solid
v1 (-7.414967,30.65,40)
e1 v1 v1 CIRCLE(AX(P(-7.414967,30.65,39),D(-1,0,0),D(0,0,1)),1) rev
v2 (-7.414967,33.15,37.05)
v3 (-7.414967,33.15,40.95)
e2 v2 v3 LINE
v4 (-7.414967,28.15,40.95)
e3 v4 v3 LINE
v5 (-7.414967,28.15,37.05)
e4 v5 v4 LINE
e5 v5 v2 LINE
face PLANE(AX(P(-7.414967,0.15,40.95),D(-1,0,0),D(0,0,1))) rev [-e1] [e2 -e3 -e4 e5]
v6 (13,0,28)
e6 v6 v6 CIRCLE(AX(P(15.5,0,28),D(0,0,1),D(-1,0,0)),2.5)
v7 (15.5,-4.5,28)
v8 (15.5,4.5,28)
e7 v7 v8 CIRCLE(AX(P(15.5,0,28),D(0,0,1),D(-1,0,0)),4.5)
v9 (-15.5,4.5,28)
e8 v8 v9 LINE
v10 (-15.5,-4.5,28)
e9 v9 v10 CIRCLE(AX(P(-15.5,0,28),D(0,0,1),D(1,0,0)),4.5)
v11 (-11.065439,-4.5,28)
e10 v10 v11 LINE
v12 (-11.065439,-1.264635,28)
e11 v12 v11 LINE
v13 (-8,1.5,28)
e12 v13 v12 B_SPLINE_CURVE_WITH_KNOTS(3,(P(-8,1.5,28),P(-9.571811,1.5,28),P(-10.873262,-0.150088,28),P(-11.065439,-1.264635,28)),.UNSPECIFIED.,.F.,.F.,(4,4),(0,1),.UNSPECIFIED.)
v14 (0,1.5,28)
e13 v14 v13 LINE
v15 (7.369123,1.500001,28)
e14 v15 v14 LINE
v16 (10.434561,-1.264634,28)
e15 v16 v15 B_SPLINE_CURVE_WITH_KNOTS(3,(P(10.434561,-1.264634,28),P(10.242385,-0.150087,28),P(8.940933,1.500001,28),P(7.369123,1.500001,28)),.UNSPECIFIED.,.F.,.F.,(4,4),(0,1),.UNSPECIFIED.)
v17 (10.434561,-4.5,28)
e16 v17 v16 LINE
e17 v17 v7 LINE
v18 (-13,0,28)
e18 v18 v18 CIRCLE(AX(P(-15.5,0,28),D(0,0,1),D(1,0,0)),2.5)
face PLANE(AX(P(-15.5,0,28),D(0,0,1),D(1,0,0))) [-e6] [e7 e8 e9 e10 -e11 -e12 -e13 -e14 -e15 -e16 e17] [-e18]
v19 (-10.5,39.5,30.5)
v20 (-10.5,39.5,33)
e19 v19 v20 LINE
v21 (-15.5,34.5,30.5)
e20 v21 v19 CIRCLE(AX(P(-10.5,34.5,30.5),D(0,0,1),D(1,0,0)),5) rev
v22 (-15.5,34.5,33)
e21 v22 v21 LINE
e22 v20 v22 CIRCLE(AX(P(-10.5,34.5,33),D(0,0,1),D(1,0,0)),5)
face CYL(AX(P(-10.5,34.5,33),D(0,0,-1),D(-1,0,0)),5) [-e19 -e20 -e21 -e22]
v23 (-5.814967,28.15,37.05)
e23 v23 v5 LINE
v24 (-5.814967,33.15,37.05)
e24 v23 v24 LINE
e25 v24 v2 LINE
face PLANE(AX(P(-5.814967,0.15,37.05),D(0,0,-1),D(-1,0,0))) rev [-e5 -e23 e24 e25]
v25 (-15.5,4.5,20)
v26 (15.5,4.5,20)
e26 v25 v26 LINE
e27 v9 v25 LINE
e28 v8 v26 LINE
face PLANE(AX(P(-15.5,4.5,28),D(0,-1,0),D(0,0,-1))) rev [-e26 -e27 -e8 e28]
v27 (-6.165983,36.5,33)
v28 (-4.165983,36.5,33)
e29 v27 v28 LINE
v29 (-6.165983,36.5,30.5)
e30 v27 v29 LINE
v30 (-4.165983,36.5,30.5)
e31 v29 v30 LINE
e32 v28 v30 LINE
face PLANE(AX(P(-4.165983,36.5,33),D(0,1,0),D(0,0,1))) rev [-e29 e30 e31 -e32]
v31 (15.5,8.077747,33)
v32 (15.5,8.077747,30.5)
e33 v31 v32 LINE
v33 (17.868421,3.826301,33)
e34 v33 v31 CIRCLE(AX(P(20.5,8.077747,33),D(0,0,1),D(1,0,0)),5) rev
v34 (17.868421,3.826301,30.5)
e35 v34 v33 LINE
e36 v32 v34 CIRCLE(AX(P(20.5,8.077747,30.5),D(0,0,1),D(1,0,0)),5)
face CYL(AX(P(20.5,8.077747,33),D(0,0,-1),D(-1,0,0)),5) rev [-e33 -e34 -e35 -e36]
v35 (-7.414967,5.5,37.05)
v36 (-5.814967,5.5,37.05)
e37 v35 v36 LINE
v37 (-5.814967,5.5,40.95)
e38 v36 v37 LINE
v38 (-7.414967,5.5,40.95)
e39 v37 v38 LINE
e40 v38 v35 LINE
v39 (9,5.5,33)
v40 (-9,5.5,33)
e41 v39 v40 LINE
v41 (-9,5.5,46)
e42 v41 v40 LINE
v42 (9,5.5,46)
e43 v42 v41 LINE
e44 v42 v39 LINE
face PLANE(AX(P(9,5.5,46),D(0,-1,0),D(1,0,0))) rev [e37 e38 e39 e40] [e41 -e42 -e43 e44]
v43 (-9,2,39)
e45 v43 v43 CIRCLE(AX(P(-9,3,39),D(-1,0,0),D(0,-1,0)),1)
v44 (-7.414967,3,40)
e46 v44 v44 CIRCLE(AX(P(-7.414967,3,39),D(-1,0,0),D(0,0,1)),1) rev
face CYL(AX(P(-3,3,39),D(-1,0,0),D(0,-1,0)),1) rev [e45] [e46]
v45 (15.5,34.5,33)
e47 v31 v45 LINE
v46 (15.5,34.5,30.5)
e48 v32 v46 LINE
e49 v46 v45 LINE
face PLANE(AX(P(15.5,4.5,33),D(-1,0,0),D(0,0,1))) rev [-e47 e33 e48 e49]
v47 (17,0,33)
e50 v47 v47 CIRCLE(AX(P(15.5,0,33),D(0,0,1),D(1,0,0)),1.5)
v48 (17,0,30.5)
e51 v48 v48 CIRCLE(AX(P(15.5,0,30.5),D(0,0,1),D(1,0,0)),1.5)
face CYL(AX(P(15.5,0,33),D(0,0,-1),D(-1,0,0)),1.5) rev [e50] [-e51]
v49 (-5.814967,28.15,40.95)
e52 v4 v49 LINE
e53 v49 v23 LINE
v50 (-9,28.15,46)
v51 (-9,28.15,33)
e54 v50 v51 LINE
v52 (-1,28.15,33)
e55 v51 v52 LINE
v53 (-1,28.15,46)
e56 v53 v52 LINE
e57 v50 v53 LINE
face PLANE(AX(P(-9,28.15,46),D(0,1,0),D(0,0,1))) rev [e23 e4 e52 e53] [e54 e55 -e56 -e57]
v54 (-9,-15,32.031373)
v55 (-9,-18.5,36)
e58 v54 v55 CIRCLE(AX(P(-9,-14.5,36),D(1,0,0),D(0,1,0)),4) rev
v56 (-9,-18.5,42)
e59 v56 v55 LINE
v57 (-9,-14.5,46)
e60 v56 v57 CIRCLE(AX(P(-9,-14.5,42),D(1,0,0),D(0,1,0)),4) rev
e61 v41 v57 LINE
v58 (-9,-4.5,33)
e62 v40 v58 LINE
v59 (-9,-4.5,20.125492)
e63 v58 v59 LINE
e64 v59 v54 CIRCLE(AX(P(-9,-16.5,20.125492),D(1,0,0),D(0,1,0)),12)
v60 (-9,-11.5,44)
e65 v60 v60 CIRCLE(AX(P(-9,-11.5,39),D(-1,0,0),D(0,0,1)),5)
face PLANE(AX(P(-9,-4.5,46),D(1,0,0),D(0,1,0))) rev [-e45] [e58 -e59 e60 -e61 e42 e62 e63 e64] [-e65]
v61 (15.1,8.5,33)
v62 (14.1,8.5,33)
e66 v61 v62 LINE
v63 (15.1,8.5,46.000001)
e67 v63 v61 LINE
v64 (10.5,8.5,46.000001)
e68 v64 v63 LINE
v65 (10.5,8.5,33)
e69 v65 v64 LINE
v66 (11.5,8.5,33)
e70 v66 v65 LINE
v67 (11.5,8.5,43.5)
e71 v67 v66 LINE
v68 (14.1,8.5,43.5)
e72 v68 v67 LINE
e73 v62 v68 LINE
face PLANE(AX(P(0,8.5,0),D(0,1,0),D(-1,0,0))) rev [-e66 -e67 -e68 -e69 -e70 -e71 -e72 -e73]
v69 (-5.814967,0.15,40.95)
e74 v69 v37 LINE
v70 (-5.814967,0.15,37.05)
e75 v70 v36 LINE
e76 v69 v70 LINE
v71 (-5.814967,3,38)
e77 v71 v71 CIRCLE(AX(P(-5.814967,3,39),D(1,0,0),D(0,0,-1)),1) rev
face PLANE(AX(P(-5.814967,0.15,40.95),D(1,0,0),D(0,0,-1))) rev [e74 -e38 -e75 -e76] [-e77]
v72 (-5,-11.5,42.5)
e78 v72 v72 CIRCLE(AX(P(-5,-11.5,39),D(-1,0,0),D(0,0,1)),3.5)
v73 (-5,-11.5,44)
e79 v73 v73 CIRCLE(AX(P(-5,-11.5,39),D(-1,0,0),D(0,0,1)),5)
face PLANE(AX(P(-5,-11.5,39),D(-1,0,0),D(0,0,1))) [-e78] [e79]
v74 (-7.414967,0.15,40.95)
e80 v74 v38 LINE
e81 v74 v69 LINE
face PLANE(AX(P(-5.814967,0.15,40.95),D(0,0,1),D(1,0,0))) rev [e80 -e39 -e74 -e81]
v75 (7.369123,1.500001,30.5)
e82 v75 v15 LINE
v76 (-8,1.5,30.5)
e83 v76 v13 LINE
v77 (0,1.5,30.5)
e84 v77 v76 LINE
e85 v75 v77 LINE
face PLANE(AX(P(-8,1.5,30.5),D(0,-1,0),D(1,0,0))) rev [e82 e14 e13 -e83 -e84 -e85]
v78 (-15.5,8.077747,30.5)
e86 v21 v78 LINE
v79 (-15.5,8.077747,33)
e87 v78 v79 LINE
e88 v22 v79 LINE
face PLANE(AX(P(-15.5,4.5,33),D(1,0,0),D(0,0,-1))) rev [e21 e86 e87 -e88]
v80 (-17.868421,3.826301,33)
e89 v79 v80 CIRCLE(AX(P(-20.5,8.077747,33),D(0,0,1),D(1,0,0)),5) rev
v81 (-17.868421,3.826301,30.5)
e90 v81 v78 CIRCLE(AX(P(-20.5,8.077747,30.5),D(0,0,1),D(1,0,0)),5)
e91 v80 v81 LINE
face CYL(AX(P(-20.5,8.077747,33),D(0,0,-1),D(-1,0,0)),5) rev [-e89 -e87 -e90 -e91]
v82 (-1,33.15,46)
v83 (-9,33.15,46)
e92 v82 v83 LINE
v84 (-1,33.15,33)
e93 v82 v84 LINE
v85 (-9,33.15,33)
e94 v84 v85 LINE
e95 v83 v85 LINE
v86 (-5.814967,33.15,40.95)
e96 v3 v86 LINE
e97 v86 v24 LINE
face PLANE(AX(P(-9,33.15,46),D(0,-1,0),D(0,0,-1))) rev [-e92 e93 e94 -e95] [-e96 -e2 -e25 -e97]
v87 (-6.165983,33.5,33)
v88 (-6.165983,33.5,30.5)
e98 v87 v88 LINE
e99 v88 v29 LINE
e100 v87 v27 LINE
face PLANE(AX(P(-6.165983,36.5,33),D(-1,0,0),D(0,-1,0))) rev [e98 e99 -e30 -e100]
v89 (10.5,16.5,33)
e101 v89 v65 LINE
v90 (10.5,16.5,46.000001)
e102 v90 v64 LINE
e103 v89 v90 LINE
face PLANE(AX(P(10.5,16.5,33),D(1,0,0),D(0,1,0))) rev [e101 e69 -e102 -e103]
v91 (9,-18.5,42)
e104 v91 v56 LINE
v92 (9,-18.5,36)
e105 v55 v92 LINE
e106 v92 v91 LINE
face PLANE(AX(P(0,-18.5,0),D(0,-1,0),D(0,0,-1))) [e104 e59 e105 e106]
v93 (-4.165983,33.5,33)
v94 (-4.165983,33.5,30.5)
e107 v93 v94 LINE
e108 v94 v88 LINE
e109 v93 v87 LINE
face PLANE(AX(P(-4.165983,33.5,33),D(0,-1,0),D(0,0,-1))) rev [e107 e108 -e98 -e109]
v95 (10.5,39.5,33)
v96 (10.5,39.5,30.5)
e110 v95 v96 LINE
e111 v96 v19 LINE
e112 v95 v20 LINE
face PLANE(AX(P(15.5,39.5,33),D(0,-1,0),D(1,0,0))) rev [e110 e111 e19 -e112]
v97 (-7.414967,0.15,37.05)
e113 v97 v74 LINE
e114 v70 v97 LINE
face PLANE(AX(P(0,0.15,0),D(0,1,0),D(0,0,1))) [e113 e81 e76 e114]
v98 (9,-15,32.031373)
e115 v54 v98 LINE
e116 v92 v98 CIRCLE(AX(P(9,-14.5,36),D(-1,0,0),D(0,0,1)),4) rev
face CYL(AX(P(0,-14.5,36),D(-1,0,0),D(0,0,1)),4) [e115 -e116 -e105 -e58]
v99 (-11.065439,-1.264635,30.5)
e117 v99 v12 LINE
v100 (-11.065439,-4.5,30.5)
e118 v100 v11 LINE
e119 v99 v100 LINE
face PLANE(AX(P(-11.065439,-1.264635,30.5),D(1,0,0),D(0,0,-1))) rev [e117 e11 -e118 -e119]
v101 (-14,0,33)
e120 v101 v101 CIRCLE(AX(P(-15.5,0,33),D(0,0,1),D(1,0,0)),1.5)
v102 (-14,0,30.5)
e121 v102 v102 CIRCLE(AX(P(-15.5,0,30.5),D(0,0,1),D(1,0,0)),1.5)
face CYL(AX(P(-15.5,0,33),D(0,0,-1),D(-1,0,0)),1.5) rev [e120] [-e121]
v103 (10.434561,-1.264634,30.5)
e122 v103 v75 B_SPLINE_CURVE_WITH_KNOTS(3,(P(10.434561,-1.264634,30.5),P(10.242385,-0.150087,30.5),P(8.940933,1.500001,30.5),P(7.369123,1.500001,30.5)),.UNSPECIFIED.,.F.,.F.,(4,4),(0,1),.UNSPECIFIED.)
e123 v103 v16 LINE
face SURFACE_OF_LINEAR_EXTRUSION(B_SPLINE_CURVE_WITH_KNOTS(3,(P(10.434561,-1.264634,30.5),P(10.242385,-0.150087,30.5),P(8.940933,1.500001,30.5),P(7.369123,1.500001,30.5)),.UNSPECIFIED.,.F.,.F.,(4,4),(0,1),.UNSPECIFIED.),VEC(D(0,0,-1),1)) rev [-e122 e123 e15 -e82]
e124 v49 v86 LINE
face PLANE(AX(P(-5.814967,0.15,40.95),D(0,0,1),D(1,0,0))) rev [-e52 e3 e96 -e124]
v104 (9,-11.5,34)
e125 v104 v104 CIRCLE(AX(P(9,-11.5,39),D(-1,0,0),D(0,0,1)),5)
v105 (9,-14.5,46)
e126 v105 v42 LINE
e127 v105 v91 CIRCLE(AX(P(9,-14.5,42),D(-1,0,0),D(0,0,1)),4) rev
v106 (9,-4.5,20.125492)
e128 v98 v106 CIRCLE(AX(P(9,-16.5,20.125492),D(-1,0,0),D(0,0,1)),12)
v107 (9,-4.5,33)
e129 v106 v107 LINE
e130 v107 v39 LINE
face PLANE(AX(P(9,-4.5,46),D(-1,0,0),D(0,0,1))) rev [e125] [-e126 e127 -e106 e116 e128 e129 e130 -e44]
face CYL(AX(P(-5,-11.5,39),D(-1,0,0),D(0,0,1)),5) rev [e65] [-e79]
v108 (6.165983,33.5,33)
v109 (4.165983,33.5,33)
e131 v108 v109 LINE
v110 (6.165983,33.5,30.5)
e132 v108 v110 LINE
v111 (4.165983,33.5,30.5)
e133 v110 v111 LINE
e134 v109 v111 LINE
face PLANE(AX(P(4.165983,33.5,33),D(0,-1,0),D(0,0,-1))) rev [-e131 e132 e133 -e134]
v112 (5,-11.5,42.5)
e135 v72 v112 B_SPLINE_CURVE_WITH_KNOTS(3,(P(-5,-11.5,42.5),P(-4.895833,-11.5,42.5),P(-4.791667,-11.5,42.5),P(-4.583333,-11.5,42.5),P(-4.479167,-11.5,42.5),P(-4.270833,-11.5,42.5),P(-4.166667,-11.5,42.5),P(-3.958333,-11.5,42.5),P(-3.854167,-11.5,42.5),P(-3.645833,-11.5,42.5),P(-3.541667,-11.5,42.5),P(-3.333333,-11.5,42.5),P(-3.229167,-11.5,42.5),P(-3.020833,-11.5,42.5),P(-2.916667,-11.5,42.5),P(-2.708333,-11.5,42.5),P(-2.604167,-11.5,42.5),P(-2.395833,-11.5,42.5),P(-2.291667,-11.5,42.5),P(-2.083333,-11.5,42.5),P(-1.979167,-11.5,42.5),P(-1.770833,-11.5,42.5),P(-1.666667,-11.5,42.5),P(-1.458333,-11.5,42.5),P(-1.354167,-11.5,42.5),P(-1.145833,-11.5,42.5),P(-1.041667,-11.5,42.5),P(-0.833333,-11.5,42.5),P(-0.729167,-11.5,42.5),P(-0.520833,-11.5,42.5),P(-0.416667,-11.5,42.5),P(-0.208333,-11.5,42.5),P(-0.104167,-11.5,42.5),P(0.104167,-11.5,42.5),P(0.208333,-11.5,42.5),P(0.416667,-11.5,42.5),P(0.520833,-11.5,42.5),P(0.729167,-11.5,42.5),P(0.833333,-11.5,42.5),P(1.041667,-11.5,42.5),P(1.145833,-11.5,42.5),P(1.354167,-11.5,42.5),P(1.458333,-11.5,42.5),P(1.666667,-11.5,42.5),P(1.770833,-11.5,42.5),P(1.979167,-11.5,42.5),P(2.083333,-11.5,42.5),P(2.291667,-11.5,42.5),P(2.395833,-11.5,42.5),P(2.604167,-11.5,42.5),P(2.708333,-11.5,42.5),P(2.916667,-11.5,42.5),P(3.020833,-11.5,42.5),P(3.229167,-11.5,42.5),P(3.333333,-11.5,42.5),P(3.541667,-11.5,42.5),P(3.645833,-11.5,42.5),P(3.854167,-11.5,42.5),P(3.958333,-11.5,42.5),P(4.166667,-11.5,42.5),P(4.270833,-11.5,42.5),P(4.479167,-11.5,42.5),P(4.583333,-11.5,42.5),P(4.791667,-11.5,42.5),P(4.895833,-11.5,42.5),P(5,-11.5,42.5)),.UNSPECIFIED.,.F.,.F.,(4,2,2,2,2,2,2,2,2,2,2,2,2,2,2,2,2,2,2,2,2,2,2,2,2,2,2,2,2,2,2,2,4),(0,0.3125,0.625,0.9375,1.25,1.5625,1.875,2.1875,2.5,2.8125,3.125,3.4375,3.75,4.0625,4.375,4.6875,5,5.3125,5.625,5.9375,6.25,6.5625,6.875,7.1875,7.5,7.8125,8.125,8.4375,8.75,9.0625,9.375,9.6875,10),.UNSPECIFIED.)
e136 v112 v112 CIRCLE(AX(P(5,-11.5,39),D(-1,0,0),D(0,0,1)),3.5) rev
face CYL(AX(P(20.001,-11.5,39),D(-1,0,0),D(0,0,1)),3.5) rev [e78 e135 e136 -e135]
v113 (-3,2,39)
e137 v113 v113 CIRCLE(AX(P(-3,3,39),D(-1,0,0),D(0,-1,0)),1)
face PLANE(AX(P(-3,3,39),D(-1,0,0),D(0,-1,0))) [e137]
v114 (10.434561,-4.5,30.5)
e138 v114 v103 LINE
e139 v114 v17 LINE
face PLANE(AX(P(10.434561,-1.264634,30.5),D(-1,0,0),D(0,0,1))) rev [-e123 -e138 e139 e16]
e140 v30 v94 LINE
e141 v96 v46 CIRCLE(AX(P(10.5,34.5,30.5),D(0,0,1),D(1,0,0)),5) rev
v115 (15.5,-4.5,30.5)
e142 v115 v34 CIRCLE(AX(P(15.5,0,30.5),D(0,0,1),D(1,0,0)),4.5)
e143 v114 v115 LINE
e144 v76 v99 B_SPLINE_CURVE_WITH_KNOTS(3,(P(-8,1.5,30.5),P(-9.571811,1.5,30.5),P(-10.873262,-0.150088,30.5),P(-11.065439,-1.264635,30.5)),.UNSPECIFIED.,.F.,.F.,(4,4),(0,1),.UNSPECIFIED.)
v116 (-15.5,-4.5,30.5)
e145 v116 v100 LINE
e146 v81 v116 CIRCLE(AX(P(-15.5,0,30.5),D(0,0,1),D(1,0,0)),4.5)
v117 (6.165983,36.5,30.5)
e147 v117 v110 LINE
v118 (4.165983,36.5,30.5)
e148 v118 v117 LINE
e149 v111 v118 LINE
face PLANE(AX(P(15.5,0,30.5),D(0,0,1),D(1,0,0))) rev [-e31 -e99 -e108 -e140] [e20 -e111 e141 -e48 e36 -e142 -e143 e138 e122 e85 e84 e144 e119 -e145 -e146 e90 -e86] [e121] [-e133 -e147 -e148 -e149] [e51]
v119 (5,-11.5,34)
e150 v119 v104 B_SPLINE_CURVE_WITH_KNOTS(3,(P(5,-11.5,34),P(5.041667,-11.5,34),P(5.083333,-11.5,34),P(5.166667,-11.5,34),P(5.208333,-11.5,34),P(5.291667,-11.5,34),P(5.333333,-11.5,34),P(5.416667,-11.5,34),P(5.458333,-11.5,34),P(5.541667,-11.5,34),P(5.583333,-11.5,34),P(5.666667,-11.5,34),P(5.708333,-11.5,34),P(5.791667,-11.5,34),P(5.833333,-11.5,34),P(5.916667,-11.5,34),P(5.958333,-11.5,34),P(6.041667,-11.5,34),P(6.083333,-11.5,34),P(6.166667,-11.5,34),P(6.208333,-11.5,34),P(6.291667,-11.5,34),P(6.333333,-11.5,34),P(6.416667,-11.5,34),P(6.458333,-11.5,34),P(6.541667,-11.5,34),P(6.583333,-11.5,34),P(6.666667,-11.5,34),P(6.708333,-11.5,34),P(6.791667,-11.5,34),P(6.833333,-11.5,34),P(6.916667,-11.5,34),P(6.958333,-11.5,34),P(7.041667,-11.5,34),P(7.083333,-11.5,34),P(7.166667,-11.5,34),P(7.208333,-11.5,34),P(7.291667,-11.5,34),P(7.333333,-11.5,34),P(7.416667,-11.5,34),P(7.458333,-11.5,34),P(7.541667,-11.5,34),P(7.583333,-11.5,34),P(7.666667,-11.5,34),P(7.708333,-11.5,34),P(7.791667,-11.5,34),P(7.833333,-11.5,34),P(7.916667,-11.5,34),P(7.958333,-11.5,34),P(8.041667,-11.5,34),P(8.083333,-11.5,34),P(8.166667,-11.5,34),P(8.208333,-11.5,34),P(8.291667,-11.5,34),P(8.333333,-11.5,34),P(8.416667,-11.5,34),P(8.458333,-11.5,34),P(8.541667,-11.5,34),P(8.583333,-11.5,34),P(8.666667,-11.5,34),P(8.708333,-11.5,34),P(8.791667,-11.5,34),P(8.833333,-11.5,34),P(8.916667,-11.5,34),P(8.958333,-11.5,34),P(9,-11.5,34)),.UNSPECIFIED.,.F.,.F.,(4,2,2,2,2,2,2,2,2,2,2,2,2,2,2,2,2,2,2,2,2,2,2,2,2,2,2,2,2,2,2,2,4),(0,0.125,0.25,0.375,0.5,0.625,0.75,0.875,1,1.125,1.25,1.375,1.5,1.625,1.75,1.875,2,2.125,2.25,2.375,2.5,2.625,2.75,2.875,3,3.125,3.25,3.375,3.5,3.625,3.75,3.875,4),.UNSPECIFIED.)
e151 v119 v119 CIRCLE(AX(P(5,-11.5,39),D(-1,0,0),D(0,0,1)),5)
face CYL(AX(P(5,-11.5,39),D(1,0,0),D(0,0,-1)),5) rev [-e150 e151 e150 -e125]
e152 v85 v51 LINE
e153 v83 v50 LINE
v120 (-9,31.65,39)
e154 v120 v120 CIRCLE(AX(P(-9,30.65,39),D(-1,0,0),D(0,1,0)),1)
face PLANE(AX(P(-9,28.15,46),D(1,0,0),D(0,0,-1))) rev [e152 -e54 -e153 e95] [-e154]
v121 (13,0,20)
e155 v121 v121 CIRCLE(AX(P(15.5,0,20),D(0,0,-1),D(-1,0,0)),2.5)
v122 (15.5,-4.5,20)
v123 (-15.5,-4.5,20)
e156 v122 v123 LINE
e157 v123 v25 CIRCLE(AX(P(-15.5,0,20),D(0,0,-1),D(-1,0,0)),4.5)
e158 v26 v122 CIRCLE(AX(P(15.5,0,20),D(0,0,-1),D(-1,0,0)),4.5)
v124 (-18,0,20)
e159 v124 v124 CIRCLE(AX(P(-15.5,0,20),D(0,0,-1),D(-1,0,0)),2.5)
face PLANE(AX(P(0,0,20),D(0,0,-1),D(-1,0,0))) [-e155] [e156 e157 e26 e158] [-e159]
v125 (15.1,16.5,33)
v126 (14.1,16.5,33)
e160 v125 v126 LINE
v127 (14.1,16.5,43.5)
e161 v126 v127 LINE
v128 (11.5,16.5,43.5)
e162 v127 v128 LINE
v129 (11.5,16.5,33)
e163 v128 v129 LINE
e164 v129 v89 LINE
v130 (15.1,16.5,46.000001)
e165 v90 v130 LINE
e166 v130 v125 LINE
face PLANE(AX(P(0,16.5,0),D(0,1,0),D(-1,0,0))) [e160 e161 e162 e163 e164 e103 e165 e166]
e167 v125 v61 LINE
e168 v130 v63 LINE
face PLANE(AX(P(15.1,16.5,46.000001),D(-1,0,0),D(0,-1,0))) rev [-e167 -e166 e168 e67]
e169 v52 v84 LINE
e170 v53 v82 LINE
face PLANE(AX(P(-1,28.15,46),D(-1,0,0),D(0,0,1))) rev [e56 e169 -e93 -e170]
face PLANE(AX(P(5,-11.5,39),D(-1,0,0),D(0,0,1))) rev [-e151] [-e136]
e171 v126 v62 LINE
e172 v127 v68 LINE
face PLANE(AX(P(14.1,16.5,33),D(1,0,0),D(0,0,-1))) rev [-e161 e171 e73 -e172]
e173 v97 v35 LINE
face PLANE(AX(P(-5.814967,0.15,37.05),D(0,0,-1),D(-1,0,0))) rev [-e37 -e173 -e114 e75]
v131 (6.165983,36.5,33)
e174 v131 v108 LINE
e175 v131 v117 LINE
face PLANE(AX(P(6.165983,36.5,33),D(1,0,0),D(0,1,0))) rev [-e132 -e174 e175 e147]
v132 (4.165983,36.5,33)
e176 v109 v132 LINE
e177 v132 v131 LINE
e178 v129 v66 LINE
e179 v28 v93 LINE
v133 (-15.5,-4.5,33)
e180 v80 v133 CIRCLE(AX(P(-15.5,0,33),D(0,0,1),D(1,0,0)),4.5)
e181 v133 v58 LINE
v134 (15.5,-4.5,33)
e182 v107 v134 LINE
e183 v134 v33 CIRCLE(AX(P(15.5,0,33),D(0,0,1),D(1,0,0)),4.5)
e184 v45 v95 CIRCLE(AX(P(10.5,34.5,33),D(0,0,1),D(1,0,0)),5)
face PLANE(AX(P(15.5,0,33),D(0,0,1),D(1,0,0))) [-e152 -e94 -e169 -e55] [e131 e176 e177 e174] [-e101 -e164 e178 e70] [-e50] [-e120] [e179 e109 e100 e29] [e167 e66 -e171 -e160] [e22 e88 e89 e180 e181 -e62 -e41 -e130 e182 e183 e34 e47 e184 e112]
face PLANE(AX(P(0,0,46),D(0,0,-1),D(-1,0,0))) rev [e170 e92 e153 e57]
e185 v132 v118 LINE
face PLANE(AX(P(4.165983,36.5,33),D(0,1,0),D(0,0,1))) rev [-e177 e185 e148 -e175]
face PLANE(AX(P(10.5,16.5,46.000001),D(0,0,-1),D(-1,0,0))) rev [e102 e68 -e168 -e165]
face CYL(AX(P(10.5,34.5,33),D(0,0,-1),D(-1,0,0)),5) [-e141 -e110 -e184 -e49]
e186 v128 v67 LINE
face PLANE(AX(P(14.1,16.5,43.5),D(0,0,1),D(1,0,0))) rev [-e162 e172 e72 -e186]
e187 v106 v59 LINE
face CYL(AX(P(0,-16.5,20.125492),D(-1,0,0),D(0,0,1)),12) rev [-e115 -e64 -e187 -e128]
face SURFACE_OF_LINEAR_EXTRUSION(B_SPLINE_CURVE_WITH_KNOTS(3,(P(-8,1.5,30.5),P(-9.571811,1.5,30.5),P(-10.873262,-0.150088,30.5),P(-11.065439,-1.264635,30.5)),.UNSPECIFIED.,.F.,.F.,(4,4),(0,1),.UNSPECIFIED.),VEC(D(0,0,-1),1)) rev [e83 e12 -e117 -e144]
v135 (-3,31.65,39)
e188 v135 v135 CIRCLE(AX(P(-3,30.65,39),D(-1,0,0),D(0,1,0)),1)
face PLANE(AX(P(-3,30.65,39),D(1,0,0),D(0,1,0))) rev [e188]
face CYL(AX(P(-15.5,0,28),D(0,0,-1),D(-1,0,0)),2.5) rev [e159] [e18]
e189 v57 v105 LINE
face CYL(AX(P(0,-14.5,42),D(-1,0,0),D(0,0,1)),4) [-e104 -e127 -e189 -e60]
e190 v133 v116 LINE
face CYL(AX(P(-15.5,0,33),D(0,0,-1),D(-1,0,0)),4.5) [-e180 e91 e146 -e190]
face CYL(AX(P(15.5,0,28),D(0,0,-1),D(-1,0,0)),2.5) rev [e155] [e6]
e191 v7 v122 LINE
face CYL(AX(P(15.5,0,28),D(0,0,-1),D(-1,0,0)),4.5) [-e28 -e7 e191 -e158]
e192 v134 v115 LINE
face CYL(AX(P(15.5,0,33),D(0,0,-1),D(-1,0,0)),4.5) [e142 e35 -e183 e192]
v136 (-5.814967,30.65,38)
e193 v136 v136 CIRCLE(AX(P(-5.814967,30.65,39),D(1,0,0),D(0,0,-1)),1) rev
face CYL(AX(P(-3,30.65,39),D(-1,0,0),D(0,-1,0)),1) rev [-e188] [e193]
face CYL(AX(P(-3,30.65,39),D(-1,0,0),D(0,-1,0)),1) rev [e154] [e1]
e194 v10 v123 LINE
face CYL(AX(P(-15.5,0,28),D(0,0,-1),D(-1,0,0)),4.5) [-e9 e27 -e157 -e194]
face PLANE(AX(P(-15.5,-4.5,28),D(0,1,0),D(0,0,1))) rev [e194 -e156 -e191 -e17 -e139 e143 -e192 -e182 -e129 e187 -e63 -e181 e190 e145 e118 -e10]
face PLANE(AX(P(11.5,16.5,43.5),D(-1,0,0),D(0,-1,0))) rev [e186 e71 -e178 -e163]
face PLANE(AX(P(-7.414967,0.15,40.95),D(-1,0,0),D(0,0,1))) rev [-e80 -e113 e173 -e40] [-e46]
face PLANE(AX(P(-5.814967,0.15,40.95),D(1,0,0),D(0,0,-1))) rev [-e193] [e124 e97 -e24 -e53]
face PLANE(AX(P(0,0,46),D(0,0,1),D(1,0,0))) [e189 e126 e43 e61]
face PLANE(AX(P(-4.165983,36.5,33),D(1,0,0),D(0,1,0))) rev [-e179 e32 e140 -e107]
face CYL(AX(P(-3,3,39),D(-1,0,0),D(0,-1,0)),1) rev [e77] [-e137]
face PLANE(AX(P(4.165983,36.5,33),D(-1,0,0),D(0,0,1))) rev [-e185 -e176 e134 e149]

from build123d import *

# Parameters (mm, degrees)
CROQUIS1_R              = 2.5
SALIENTE_EXTRUIR1_DEPTH = 28
SALIENTE_EXTRUIR3_DEPTH = 2.5
CROQUIS8_R              = 1.5
SALIENTE_EXTRUIR4_DEPTH = 2.5
CROQUIS9_W              = 18
CROQUIS9_H              = 10
SALIENTE_EXTRUIR5_DEPTH = 13
CROQUIS3_W              = 18
CROQUIS3_H              = 14
SALIENTE_EXTRUIR2_DEPTH = 14
CROQUIS4_R              = 5
CORTAR_EXTRUIR1_DEPTH   = 4
CORTAR_EXTRUIR2_START   = -14
CROQUIS4_2_R            = 5
CORTAR_EXTRUIR2_DEPTH   = 4
CORTAR_EXTRUIR3_REACH   = 67.584
CROQUIS5_R              = 3.5
REDONDEO1_R             = 4
CROQUIS10_W             = 40
CROQUIS10_H             = 9
CORTAR_EXTRUIR4_DEPTH   = 20
CROQUIS11_W             = 8
CROQUIS11_H             = 5
SALIENTE_EXTRUIR6_DEPTH = 13
CROQUIS12_R             = 1
CORTAR_EXTRUIR5_DEPTH   = 6
CROQUIS13_W             = 1.6
CROQUIS13_H             = 3.9
CORTAR_EXTRUIR6_DEPTH   = 33
REDONDEO2_R             = 5
REDONDEO3_R             = 12
SALIENTE_EXTRUIR7_START = 3
SALIENTE_EXTRUIR7_DEPTH = 8
CROQUIS16_W             = 2
CROQUIS16_H             = 3
CORTAR_EXTRUIR7_DEPTH   = 2.5


with BuildPart() as part:
    # Croquis1 → Saliente-Extruir1 (new body)
    with BuildSketch(Plane.XY):
        with BuildLine():
            Line((-15.5, 4.5), (15.5, 4.5))
            ThreePointArc((15.5, 4.5), (20, 0), (15.5, -4.5))
            Line((15.5, -4.5), (-15.5, -4.5))
            ThreePointArc((-15.5, -4.5), (-20, 0), (-15.5, 4.5))
        make_face()
        with Locations((-15.5, 0)):
            Circle(CROQUIS1_R, mode=Mode.SUBTRACT)
        with Locations(Location((15.5, 0, 0), (0, 0, 180))):
            Circle(CROQUIS1_R, mode=Mode.SUBTRACT)
    extrude(amount=SALIENTE_EXTRUIR1_DEPTH)

    # Croquis7 → Saliente-Extruir3 (add)
    with BuildSketch(Plane.XY.offset(28)):
        with BuildLine():
            Line((10.434561388, -1.264633608), (10.434561388, -4.5))
            Line((10.434561388, -4.5), (-11.065438612, -4.5))
            Line((-11.065438612, -4.5), (-11.065438612, -1.264634516))
            add(Edge.make_bspline(
                [(-11.065438612, -1.264634516), (-10.873261798, -0.150088047), (-9.571810624, 1.50000001), (-7.999999983, 1.5)],
                knots=[0, 0, 0, 0, 1, 1, 1, 1], degree=3))
            Line((-7.999999983, 1.5), (1e-08, 1.5))
            Line((1e-08, 1.5), (7.369122804, 1.500000949))
            add(Edge.make_bspline(
                [(7.369122804, 1.500000949), (8.940933445, 1.500000937), (10.242384596, -0.150087137), (10.434561388, -1.264633608)],
                knots=[0, 0, 0, 0, 1, 1, 1, 1], degree=3))
        make_face()
    extrude(amount=SALIENTE_EXTRUIR3_DEPTH)

    # Croquis8 → Saliente-Extruir4 (add)
    with BuildSketch(Plane.XY.offset(30.5)):
        with BuildLine():
            Line((15.5, 4.5), (15.5, 39.5))
            Line((15.5, 39.5), (-15.5, 39.5))
            Line((-15.5, 39.5), (-15.5, 4.5))
            ThreePointArc((-15.5, 4.5), (-20, 0), (-15.5, -4.5))
            Line((-15.5, -4.5), (15.5, -4.5))
            ThreePointArc((15.5, -4.5), (20, 0), (15.5, 4.5))
        make_face()
        with Locations((15.5, 0)):
            Circle(CROQUIS8_R, mode=Mode.SUBTRACT)
        with Locations((-15.5, 0)):
            Circle(CROQUIS8_R, mode=Mode.SUBTRACT)
    extrude(amount=SALIENTE_EXTRUIR4_DEPTH)

    # Croquis9 → Saliente-Extruir5 (add)
    with BuildSketch(Plane.XY.offset(33)):
        with Locations((0, 0.5)):
            Rectangle(CROQUIS9_W, CROQUIS9_H)
    extrude(amount=SALIENTE_EXTRUIR5_DEPTH)

    # Croquis3 → Saliente-Extruir2 (add)
    with BuildSketch(Plane.XZ.offset(4.5)):
        with Locations((0, 39)):
            Rectangle(CROQUIS3_W, CROQUIS3_H)
    extrude(amount=SALIENTE_EXTRUIR2_DEPTH)

    # Croquis4 → Cortar-Extruir1 (cut)
    with BuildSketch(Plane.ZY.offset(9)):
        with Locations((39, -11.5)):
            Circle(CROQUIS4_R)
    extrude(amount=-CORTAR_EXTRUIR1_DEPTH, mode=Mode.SUBTRACT)

    # Croquis4<2> → Cortar-Extruir2 (cut)
    with BuildSketch(Plane.ZY.offset(9).offset(CORTAR_EXTRUIR2_START)):
        with Locations((39, -11.5)):
            Circle(CROQUIS4_2_R)
    extrude(amount=-CORTAR_EXTRUIR2_DEPTH, mode=Mode.SUBTRACT)

    # Croquis5 → Cortar-Extruir3 (cut, up to next)
    with BuildSketch(Plane.ZY.offset(5), mode=Mode.PRIVATE) as cortar_extruir3_sk1:
        with Locations((39, -11.5)):
            Circle(CROQUIS5_R)
    cortar_extruir3_tool1 = extrude(cortar_extruir3_sk1.sketch, amount=-CORTAR_EXTRUIR3_REACH, mode=Mode.PRIVATE) & part.part
    add(cortar_extruir3_tool1.solids().sort_by_distance((-5, -11.5, 39))[0], mode=Mode.SUBTRACT)

    # Redondeo1
    redondeo1_edges = [part.edges().sort_by_distance(p)[0] for p in [
        (0, -18.5, 32),
        (0, -18.5, 46),
    ]]
    fillet(redondeo1_edges, radius=REDONDEO1_R)

    # Croquis10 → Cortar-Extruir4 (cut)
    with BuildSketch(Plane(origin=(0, 0, 0), x_dir=(-1, 0, 0), z_dir=(0, 0, -1))):
        Rectangle(CROQUIS10_W, CROQUIS10_H)
    extrude(amount=-CORTAR_EXTRUIR4_DEPTH, mode=Mode.SUBTRACT)

    # Croquis11 → Saliente-Extruir6 (add)
    with BuildSketch(Plane.XY.offset(33)):
        with Locations((-5, 30.65)):
            Rectangle(CROQUIS11_W, CROQUIS11_H)
    extrude(amount=SALIENTE_EXTRUIR6_DEPTH)

    # Croquis12 → Cortar-Extruir5 (cut)
    with BuildSketch(Plane.ZY.offset(9)):
        with Locations(Location((39, 3, 0), (0, 0, 270))):
            Circle(CROQUIS12_R)
        with Locations(Location((39, 30.65, 0), (0, 0, 90))):
            Circle(CROQUIS12_R)
    extrude(amount=-CORTAR_EXTRUIR5_DEPTH, mode=Mode.SUBTRACT)

    # Croquis13 → Cortar-Extruir6 (cut)
    with BuildSketch(Plane(origin=(0, 33.15, 0), x_dir=(1, 0, 0), z_dir=(0, 1, 0))):
        with Locations((-6.614967389, -39)):
            Rectangle(CROQUIS13_W, CROQUIS13_H)
    extrude(amount=-CORTAR_EXTRUIR6_DEPTH, mode=Mode.SUBTRACT)

    # Redondeo2
    redondeo2_edges = [part.edges().sort_by_distance(p)[0] for p in [
        (-15.5, 39.5, 31.75),
        (-15.5, 4.5, 31.75),
        (15.5, 4.5, 31.75),
        (15.5, 39.5, 31.75),
    ]]
    fillet(redondeo2_edges, radius=REDONDEO2_R)

    # Redondeo3
    # the kernel refuses this fillet: 12 mm, written as the material it adds along each edge
    with BuildSketch(Plane(origin=(9, -4.5, 32), x_dir=(0, 0, -1), z_dir=(-1, 0, 0))) as redondeo3_piece_1:
        with BuildLine():
            CenterArc((11.874507866, 12), REDONDEO3_R, 187.180755781, 82.819244219)
            Line((-0.031373033, 10.5), (-1.221961123, 10.35))
            ThreePointArc((-1.221961123, 10.35), (-1.2, 10), (-1.2, 0))
            Line((-1.2, 0), (0, -1.2))
            Line((0, -1.2), (11.874507866, -1.2))
            Line((11.874507866, -1.2), (11.874507866, 0))
        make_face()
    extrude(amount=18)

    # Croquis14 → Saliente-Extruir7 (add)
    with BuildSketch(Plane(origin=(0, 5.5, 0), x_dir=(1, 0, 0), z_dir=(0, 1, 0)).offset(SALIENTE_EXTRUIR7_START)):
        Polygon((10.5, -33), (10.5, -46.00000144), (15.1, -46.00000144), (15.1, -33), (14.1, -33), (14.1, -43.5), (11.5, -43.5), (11.5, -33), align=None)
    extrude(amount=SALIENTE_EXTRUIR7_DEPTH)

    # Croquis16 → Cortar-Extruir7 (cut)
    with BuildSketch(Plane(origin=(0, 0, 30.5), x_dir=(-1, 0, 0), z_dir=(0, 0, -1))):
        with Locations((-5.165983378, 35)):
            Rectangle(CROQUIS16_W, CROQUIS16_H)
        with Locations((5.165983378, 35)):
            Rectangle(CROQUIS16_W, CROQUIS16_H)
    extrude(amount=-CORTAR_EXTRUIR7_DEPTH, mode=Mode.SUBTRACT)


solid = part.part
